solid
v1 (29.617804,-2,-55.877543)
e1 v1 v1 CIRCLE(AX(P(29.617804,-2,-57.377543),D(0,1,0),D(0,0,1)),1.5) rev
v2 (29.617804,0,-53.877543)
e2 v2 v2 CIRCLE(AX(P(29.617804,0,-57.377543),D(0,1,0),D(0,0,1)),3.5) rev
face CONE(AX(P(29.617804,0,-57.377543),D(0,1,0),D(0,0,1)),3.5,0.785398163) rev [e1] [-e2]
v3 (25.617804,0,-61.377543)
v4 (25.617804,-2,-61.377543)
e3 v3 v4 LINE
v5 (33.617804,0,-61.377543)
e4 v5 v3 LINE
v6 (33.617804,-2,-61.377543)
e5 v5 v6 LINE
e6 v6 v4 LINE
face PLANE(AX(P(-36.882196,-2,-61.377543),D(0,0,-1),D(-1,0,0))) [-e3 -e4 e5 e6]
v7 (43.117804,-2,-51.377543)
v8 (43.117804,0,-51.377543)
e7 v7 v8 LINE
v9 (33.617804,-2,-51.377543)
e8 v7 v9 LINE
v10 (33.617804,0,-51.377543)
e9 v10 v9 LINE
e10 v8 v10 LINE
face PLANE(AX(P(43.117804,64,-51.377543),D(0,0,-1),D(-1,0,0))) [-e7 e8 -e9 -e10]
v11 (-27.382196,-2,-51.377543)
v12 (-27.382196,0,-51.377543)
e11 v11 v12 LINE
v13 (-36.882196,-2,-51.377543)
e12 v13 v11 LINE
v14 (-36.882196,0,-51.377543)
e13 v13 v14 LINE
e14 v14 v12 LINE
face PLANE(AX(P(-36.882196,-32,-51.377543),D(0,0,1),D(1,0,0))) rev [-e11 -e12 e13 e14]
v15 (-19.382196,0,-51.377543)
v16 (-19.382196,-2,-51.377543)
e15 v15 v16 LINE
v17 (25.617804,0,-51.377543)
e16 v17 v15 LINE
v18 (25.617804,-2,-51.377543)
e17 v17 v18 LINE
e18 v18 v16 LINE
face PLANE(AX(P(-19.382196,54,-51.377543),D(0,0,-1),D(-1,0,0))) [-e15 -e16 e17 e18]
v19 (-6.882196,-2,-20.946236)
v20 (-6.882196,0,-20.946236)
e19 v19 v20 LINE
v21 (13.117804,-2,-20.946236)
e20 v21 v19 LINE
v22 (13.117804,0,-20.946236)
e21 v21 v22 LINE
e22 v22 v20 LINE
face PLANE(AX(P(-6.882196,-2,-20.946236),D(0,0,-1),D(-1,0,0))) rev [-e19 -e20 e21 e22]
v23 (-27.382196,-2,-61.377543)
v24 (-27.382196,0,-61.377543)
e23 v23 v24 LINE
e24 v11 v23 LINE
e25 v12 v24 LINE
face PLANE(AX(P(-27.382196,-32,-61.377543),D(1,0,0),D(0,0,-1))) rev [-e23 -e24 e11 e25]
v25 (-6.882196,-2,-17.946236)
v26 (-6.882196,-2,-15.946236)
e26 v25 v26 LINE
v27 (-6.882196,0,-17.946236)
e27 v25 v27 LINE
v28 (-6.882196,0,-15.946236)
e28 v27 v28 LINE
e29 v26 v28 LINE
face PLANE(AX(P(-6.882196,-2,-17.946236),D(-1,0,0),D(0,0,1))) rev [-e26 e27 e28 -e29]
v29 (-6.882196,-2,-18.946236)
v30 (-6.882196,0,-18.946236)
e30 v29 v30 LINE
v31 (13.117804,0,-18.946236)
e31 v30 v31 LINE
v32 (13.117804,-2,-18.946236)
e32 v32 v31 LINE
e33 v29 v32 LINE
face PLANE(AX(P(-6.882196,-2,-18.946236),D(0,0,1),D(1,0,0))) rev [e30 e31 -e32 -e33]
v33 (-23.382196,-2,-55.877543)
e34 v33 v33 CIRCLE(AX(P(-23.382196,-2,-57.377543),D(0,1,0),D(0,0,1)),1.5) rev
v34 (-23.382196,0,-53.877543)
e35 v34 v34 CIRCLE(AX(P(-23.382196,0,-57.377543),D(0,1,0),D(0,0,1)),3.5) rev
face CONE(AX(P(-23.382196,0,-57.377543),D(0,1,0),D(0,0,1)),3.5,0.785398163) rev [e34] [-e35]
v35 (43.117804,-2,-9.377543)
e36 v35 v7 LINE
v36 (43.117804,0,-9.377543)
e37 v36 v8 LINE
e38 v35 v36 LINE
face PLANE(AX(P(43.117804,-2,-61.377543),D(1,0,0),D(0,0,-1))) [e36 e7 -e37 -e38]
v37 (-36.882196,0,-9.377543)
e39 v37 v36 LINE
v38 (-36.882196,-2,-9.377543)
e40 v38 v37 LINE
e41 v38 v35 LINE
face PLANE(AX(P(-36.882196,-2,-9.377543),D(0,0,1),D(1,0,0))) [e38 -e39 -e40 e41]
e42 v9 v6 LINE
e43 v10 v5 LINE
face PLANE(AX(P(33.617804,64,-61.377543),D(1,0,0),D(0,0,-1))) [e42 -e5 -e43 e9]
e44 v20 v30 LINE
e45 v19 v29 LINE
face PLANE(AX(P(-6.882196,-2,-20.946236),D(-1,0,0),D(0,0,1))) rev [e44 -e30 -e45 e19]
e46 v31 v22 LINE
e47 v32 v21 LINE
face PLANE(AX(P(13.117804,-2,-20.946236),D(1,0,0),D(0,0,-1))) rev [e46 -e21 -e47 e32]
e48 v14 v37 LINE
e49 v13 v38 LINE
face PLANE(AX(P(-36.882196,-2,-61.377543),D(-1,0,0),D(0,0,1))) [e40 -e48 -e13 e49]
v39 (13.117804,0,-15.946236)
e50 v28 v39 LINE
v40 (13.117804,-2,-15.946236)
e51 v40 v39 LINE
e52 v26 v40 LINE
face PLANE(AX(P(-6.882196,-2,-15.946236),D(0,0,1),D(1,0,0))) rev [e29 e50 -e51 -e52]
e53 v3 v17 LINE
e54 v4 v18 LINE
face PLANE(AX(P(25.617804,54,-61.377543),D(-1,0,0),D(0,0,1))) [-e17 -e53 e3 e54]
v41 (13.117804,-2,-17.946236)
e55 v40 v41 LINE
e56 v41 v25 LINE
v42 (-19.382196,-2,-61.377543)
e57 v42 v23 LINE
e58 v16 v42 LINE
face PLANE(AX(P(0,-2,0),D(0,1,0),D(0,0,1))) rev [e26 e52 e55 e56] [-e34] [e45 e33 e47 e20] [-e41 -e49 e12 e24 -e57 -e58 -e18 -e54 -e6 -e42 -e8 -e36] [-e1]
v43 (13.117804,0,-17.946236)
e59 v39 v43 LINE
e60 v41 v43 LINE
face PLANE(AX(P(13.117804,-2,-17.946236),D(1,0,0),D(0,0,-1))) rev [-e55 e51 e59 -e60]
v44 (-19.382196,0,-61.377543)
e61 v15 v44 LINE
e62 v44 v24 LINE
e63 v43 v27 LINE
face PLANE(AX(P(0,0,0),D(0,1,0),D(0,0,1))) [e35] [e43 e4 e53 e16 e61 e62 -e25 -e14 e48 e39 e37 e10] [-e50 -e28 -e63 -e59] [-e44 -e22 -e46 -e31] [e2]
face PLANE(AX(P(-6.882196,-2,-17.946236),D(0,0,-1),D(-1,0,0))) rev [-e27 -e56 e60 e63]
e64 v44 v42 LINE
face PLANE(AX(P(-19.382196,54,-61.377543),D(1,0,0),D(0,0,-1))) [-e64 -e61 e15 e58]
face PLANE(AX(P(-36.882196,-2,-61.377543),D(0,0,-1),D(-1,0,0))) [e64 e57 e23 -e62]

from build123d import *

# Parameters (mm, degrees)
SKETCH_4_W               = 80
SKETCH_4_H               = 52
EXTRUDE_2_DEPTH          = 2
CUT_EXTRUDE_4_DEPTH      = 35
CUT_EXTRUDE_4_DEPTH_BACK = 32
SKETCH_5_W               = 9.5
SKETCH_5_H               = 10
CUT_EXTRUDE_5_DEPTH      = 54
CUT_EXTRUDE_5_DEPTH_BACK = 45
SKETCH_6_W               = 45
SKETCH_6_H               = 10
CUT_EXTRUDE_6_DEPTH      = 64
CUT_EXTRUDE_6_DEPTH_BACK = 67
SKETCH_7_W               = 9.5
SKETCH_7_H               = 10
CUT_EXTRUDE_7_DEPTH      = 30
CUT_EXTRUDE_7_DEPTH_BACK = 30
SKETCH_8_R               = 1.5
CHAMFER_1_SIZE           = 2
CUT_EXTRUDE_8_DEPTH      = 20
CUT_EXTRUDE_8_DEPTH_BACK = 33
SKETCH_9_R               = 1.5
CHAMFER_2_SIZE           = 2
SKETCH_10_W              = 20
SKETCH_10_H              = 2
CUT_EXTRUDE_9_DEPTH      = 2


with BuildPart() as part:
    # Эскиз4 → Бобышка-Вытянуть2 (new body)
    with BuildSketch(Plane(origin=(0, 0, 0), x_dir=(1, 0, 0), z_dir=(0, 1, 0))):
        with Locations((3.117803535, 35.377543141)):
            Rectangle(SKETCH_4_W, SKETCH_4_H)
    extrude(amount=-EXTRUDE_2_DEPTH)

    # Эскиз5 → Вырез-Вытянуть4 (cut, two sides: drawn at the far end of the back side and taken through both)
    with BuildSketch(Plane(origin=(0, 0, 0), x_dir=(1, 0, 0), z_dir=(0, 1, 0)).offset(-CUT_EXTRUDE_4_DEPTH_BACK)):
        with Locations((-32.132196465, 56.377543141)):
            Rectangle(SKETCH_5_W, SKETCH_5_H)
    extrude(amount=CUT_EXTRUDE_4_DEPTH + CUT_EXTRUDE_4_DEPTH_BACK, mode=Mode.SUBTRACT)

    # Эскиз6 → Вырез-Вытянуть5 (cut, two sides: drawn at the far end of the back side and taken through both)
    with BuildSketch(Plane(origin=(0, 0, 0), x_dir=(1, 0, 0), z_dir=(0, 1, 0)).offset(-CUT_EXTRUDE_5_DEPTH_BACK)):
        with Locations((3.117803535, 56.377543141)):
            Rectangle(SKETCH_6_W, SKETCH_6_H)
    extrude(amount=CUT_EXTRUDE_5_DEPTH + CUT_EXTRUDE_5_DEPTH_BACK, mode=Mode.SUBTRACT)

    # Эскиз7 → Вырез-Вытянуть6 (cut, two sides: drawn at the far end of the back side and taken through both)
    with BuildSketch(Plane(origin=(0, 0, 0), x_dir=(1, 0, 0), z_dir=(0, 1, 0)).offset(-CUT_EXTRUDE_6_DEPTH_BACK)):
        with Locations((38.367803535, 56.377543141)):
            Rectangle(SKETCH_7_W, SKETCH_7_H)
    extrude(amount=CUT_EXTRUDE_6_DEPTH + CUT_EXTRUDE_6_DEPTH_BACK, mode=Mode.SUBTRACT)

    # Эскиз8 → Вырез-Вытянуть7 (cut, two sides: drawn at the far end of the back side and taken through both)
    with BuildSketch(Plane(origin=(0, 0, 0), x_dir=(1, 0, 0), z_dir=(0, 1, 0)).offset(-CUT_EXTRUDE_7_DEPTH_BACK)):
        with Locations(Location((-23.382196465, 57.377543141, 0), (0, 0, 270))):
            Circle(SKETCH_8_R)
    extrude(amount=CUT_EXTRUDE_7_DEPTH + CUT_EXTRUDE_7_DEPTH_BACK, mode=Mode.SUBTRACT)

    # Фаска1
    chamfer_1_edges = [part.edges().sort_by_distance(p)[0] for p in [
        (-23.382196465, 0, -58.877543141),
    ]]
    chamfer(chamfer_1_edges, length=CHAMFER_1_SIZE - 0.0001)  # a hair under: the kernel refuses the full size

    # Эскиз9 → Вырез-Вытянуть8 (cut, two sides: drawn at the far end of the back side and taken through both)
    with BuildSketch(Plane(origin=(0, 0, 0), x_dir=(1, 0, 0), z_dir=(0, 1, 0)).offset(-CUT_EXTRUDE_8_DEPTH_BACK)):
        with Locations(Location((29.617803535, 57.377543141, 0), (0, 0, 270))):
            Circle(SKETCH_9_R)
    extrude(amount=CUT_EXTRUDE_8_DEPTH + CUT_EXTRUDE_8_DEPTH_BACK, mode=Mode.SUBTRACT)

    # Фаска2
    chamfer_2_edges = [part.edges().sort_by_distance(p)[0] for p in [
        (29.617803535, 0, -58.877543141),
    ]]
    chamfer(chamfer_2_edges, length=CHAMFER_2_SIZE - 0.0001)  # a hair under: the kernel refuses the full size

    # Эскиз10 → Вырез-Вытянуть9 (cut)
    with BuildSketch(Plane(origin=(0, 0, 0), x_dir=(1, 0, 0), z_dir=(0, 1, 0))):
        with Locations((3.117803535, 16.946236335)):
            Rectangle(SKETCH_10_W, SKETCH_10_H)
        with Locations((3.117803535, 19.946236335)):
            Rectangle(SKETCH_10_W, SKETCH_10_H)
    extrude(amount=-CUT_EXTRUDE_9_DEPTH, mode=Mode.SUBTRACT)


solid = part.part
